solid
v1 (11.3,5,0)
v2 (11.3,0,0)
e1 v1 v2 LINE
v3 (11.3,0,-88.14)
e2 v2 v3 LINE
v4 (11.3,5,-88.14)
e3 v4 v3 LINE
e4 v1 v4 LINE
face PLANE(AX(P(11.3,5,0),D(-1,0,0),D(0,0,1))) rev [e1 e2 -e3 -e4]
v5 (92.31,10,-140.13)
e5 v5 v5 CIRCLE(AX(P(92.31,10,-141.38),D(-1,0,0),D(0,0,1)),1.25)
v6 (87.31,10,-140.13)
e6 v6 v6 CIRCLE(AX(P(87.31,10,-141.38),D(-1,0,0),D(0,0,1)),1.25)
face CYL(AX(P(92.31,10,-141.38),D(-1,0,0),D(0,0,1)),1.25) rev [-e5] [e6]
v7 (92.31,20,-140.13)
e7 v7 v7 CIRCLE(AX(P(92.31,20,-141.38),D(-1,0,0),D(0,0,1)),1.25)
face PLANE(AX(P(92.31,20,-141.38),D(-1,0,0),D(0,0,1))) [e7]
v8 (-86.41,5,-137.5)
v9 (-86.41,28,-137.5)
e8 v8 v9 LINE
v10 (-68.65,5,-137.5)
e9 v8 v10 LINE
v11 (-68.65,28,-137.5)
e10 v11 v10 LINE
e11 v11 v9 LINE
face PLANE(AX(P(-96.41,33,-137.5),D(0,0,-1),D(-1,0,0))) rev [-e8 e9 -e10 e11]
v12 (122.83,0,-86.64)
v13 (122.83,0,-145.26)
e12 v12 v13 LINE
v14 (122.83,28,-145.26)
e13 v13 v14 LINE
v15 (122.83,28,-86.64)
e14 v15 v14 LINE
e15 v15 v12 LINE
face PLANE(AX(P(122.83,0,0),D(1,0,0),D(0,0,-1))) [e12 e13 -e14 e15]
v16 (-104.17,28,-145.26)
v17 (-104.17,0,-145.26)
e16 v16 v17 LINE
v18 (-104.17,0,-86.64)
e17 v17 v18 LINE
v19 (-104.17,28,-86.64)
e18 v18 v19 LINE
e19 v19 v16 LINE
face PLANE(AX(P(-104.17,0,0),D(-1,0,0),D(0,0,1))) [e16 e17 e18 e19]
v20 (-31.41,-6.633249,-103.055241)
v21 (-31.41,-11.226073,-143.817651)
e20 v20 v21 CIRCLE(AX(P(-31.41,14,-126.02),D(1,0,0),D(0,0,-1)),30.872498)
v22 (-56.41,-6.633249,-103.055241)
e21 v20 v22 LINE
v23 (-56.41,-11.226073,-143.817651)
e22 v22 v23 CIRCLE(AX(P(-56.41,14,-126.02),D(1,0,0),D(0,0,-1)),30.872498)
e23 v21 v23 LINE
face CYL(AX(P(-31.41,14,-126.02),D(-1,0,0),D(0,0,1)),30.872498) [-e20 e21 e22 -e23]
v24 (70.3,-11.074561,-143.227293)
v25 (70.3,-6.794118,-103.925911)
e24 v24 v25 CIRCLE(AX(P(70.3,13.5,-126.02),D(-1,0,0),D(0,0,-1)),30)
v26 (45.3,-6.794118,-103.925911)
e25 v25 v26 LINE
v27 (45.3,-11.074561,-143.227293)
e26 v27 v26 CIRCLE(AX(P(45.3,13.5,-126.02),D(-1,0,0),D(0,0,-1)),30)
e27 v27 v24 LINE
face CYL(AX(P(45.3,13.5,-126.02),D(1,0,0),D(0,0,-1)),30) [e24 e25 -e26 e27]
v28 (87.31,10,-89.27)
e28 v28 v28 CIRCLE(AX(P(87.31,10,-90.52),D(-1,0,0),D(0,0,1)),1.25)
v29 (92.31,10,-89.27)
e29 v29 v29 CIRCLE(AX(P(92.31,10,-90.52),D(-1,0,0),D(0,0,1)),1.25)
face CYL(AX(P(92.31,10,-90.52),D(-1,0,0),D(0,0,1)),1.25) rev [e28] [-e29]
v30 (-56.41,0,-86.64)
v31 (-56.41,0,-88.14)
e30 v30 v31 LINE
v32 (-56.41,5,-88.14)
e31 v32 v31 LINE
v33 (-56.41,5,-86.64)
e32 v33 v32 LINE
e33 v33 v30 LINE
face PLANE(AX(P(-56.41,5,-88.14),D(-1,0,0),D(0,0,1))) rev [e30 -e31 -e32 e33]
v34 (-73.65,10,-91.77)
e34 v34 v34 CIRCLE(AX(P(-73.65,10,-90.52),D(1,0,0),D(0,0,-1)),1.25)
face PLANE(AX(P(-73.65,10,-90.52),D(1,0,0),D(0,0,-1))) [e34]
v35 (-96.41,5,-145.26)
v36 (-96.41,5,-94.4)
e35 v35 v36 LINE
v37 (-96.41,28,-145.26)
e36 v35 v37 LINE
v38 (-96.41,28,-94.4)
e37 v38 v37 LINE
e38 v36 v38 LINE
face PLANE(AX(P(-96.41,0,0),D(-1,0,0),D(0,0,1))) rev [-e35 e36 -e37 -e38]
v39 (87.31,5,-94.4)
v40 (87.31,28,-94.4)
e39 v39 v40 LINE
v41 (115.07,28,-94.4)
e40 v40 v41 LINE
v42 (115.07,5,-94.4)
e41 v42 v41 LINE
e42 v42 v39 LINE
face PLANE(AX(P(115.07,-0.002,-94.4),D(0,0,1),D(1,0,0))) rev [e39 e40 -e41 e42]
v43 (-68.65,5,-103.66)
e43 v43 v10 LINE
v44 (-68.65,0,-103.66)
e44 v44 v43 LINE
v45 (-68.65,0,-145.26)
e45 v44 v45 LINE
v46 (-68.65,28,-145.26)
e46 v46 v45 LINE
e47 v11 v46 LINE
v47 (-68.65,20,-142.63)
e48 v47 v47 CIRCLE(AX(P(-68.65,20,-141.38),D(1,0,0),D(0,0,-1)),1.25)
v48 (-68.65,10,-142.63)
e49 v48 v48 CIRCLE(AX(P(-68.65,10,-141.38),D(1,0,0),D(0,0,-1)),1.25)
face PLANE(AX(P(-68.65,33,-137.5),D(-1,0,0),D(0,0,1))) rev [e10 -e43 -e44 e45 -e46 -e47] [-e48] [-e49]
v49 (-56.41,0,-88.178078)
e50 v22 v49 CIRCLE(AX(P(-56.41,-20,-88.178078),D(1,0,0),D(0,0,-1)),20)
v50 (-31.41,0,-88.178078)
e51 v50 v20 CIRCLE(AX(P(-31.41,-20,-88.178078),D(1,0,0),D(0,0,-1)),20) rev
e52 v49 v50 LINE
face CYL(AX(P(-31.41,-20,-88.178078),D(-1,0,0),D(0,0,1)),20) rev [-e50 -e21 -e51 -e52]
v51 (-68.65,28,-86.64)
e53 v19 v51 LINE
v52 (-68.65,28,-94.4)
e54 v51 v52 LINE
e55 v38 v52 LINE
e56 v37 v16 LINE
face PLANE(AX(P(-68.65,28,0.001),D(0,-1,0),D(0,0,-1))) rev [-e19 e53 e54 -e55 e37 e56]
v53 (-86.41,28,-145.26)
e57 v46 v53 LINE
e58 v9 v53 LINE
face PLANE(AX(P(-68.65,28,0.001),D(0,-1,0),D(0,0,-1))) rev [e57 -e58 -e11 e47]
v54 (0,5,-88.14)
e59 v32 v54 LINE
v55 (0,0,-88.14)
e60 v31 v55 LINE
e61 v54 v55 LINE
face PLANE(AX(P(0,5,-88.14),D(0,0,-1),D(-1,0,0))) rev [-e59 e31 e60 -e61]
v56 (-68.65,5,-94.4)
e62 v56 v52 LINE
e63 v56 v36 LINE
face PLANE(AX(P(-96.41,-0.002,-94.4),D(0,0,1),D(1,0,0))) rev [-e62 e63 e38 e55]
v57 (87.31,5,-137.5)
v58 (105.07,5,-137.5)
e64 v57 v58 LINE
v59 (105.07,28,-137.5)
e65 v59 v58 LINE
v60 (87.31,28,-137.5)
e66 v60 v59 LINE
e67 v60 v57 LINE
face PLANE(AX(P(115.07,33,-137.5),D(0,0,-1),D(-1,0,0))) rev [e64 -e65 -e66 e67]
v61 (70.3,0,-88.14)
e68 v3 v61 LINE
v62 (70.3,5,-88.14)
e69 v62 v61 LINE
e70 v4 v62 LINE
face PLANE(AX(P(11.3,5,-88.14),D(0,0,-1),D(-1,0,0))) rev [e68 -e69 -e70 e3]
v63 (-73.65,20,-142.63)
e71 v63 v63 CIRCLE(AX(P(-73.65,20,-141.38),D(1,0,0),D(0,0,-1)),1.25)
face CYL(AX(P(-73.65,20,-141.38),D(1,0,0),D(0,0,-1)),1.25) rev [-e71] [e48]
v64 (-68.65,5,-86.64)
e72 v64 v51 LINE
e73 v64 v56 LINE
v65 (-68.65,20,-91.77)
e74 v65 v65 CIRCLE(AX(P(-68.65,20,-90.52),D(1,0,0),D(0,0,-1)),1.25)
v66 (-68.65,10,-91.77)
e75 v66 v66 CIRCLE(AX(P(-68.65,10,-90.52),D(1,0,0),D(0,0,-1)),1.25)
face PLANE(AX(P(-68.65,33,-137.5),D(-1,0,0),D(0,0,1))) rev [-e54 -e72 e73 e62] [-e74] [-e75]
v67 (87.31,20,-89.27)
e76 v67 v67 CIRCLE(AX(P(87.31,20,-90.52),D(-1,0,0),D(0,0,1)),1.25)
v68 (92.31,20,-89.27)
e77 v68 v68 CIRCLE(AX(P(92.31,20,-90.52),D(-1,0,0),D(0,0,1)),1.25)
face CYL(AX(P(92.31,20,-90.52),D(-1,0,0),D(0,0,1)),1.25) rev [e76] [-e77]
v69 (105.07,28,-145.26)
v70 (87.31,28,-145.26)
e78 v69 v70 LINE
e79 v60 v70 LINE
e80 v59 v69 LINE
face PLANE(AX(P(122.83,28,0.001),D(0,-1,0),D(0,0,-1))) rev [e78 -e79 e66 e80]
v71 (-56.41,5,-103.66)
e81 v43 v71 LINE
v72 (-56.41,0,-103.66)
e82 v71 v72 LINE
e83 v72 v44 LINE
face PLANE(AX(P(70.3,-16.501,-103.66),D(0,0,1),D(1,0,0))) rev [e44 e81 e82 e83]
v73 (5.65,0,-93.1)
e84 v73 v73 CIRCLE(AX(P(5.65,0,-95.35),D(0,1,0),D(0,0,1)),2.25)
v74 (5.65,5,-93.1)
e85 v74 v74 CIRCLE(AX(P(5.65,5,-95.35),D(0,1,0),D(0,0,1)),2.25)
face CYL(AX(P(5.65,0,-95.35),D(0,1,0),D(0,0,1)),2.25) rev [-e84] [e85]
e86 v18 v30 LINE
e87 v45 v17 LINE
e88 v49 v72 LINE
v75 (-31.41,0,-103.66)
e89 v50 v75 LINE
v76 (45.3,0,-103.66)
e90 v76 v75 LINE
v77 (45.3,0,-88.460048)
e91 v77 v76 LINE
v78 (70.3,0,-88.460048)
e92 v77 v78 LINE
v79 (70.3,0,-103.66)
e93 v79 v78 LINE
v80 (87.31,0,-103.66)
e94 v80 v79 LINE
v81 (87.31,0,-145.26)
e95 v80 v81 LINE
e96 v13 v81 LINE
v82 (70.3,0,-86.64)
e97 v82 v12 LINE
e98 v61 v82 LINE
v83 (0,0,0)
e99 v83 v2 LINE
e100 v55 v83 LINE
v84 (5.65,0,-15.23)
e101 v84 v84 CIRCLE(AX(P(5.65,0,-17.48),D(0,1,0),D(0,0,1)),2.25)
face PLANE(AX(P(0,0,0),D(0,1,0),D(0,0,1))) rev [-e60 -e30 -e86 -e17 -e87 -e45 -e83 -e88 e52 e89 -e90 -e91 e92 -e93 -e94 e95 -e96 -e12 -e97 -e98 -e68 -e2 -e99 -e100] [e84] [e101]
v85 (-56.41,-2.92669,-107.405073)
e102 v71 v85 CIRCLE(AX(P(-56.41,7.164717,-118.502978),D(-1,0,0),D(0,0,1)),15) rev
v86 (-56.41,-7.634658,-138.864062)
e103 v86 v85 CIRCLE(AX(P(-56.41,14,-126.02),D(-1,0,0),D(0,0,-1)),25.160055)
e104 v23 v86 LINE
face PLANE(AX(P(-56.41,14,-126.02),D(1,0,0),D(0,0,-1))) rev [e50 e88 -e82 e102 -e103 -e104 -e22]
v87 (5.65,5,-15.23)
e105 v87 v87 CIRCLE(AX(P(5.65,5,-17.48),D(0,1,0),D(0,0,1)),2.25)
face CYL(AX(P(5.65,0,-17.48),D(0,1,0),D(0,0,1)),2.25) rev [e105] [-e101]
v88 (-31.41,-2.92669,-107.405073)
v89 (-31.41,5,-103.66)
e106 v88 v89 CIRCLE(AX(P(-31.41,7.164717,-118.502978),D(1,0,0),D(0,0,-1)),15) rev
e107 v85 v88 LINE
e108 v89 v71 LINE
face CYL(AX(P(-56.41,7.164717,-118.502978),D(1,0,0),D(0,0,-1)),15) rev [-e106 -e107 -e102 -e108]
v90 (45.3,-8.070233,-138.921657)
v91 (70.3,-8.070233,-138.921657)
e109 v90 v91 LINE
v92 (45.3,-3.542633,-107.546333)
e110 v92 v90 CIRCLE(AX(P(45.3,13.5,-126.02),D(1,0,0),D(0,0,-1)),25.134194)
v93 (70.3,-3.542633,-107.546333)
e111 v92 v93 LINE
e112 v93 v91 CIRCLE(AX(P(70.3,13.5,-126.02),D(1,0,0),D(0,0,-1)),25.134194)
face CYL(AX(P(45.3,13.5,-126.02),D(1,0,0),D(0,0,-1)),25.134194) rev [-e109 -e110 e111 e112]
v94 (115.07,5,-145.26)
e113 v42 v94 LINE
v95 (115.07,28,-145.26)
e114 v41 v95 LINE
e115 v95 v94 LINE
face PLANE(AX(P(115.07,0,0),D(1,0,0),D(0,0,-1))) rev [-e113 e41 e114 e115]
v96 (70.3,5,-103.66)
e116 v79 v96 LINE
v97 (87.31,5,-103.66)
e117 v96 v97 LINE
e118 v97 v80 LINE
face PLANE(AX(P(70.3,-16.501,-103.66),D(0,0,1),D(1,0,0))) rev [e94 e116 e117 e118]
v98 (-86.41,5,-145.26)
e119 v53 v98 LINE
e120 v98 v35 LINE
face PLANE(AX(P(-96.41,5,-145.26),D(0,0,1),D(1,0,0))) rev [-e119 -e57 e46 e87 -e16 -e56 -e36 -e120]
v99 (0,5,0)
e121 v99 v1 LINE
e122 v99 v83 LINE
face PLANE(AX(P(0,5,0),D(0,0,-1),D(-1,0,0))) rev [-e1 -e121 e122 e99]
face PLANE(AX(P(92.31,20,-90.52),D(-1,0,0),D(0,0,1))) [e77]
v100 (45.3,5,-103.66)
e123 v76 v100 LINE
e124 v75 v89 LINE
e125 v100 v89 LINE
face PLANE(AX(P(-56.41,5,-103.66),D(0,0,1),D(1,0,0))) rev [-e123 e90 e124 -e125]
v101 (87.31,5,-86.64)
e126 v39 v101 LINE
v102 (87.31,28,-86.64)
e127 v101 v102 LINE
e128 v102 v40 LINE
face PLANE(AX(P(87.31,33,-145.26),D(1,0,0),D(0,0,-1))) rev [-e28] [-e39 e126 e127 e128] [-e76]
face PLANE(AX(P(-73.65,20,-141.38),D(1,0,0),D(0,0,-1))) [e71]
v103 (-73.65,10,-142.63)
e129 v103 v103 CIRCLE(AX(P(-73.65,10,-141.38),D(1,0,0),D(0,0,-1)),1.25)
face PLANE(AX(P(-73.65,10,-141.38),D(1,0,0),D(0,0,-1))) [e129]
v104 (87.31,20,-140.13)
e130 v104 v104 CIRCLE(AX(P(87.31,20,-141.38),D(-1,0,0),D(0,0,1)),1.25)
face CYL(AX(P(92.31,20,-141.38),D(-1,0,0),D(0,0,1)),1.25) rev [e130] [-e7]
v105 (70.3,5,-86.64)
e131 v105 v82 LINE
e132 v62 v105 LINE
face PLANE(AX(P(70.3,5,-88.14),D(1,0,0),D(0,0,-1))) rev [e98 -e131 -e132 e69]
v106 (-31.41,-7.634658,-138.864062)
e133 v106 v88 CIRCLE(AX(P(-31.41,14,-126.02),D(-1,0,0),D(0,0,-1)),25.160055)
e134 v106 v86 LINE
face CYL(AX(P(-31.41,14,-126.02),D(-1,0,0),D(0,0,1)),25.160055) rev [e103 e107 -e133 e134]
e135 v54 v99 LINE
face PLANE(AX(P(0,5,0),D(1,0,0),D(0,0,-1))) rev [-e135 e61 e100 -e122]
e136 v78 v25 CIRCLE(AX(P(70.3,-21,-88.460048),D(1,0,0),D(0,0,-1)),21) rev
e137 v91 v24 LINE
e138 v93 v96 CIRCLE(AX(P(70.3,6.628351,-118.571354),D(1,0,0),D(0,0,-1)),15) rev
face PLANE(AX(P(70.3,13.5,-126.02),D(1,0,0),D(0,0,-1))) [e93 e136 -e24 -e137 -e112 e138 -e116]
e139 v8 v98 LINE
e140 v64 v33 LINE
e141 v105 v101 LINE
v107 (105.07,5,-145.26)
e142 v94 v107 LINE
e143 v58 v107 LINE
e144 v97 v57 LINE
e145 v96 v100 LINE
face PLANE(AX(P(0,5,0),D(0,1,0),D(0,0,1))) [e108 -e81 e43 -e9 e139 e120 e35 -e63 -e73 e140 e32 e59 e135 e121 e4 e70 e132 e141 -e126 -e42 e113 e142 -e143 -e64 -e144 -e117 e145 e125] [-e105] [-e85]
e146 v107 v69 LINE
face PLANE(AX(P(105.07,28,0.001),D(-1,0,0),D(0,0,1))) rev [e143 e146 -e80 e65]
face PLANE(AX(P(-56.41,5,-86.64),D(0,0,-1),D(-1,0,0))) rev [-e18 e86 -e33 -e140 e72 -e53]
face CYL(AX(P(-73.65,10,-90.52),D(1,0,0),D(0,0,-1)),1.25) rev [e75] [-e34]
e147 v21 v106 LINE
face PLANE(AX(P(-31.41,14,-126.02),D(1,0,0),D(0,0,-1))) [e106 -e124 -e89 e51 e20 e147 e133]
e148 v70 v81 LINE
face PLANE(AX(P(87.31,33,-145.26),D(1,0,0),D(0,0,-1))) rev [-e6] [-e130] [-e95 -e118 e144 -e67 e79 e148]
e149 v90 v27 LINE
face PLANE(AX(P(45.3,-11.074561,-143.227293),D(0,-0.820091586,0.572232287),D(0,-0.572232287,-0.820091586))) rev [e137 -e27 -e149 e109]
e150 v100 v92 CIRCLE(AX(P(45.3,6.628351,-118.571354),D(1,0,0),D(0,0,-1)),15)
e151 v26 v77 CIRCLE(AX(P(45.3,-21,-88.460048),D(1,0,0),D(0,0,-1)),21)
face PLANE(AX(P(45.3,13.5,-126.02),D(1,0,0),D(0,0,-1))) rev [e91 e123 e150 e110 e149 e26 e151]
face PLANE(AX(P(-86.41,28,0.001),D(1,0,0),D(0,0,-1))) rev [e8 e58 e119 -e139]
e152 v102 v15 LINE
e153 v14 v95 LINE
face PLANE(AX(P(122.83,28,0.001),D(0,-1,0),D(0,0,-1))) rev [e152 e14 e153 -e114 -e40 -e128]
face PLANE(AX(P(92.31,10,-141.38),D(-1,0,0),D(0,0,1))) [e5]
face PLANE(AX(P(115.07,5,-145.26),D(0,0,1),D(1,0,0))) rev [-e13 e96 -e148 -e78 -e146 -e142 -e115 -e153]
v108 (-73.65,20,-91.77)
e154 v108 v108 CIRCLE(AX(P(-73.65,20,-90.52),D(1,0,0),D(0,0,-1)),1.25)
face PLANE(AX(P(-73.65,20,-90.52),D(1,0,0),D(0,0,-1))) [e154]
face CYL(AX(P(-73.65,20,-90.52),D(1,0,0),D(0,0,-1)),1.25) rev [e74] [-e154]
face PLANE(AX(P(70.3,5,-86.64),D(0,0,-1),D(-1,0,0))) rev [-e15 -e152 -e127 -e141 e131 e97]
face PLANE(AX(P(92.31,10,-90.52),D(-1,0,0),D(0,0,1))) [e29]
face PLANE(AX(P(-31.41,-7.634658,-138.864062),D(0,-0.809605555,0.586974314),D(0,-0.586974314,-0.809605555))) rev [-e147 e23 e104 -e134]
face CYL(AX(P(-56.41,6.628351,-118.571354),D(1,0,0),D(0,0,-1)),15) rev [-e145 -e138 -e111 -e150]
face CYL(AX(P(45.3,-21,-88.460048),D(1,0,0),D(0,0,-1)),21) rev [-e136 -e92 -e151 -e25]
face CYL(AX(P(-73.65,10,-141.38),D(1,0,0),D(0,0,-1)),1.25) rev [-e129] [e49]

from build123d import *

# Parameters (mm, degrees)
BOSS_EXTRUDE1_DEPTH  = 5
SKETCH6_W            = 1.81
SKETCH6_H            = 7.76
SKETCH6_W_2          = 18.76
BOSS_EXTRUDE2_DEPTH  = 28
BOSS_EXTRUDE3_REACH  = 259.198
SKETCH7_W            = 7.76
SKETCH7_H            = 5
SKETCH9_W            = 27.76
SKETCH9_H            = 5
BOSS_EXTRUDE4_DEPTH  = 58.62
BOSS_EXTRUDE5_REACH  = 189.418
SKETCH10_W           = 27.76
SKETCH10_H           = 7.76
SKETCH11_W           = 58.62
SKETCH11_H           = 33
BOSS_EXTRUDE6_DEPTH  = 7.76
SKETCH12_R           = 2.25
CUT_EXTRUDE1_DEPTH   = 188.418175479
SKETCH13_W           = 1.81
SKETCH13_H           = 7.76
SKETCH13_W_2         = 18.76
BOSS_EXTRUDE7_DEPTH  = 28
BOSS_EXTRUDE8_REACH  = 265.563
SKETCH14_W           = 7.76
SKETCH14_H           = 5
SKETCH15_W           = 27.76
SKETCH15_H           = 5
BOSS_EXTRUDE9_DEPTH  = 50.86
BOSS_EXTRUDE10_REACH = 189.418
SKETCH16_W           = 27.76
SKETCH16_H           = 7.76
SKETCH17_W           = 58.62
SKETCH17_H           = 33
BOSS_EXTRUDE11_DEPTH = 7.76
CUT_EXTRUDE4_REACH   = 195.072
SKETCH23_W           = 35.52
SKETCH23_H           = 5
CUT_EXTRUDE5_REACH   = 195.072
SKETCH24_W           = 35.52
SKETCH24_H           = 5
SKETCH25_W           = 7.76
SKETCH25_H           = 23
CUT_EXTRUDE6_DEPTH   = 1.81
SKETCH26_W           = 7.76
SKETCH26_H           = 23
CUT_EXTRUDE7_DEPTH   = 1.81
SKETCH27_R           = 1.25
CUT_EXTRUDE8_DEPTH   = 5
CUT_EXTRUDE9_START   = -5
SKETCH28_R           = 1.25
CUT_EXTRUDE9_DEPTH   = 5
BOSS_EXTRUDE14_DEPTH = 25
SKETCH30_W           = 7.667684365
SKETCH30_H           = 9.552630881
CUT_EXTRUDE13_DEPTH  = 30
FILLET2_R            = 15
CUT_EXTRUDE14_REACH  = 193.616
SKETCH31_W           = 5
SKETCH31_H           = 41.6
FILLET6_R            = 21
BOSS_EXTRUDE15_DEPTH = 25
FILLET7_R            = 15
FILLET8_R            = 20
SKETCH37_W           = 7.377214054
SKETCH37_H           = 9
CUT_EXTRUDE16_DEPTH  = 25
CUT_EXTRUDE17_REACH  = 194.28
SKETCH38_W           = 1
SKETCH38_H           = 23
SKETCH39_W           = 12.24
SKETCH39_H           = 5
SKETCH39_W_2         = 12.01
CUT_EXTRUDE19_DEPTH  = 41.6


with BuildPart() as part:
    # Sketch5 → Boss-Extrude1 (new body)
    with BuildSketch(Plane(origin=(0, 0, 0), x_dir=(1, 0, 0), z_dir=(0, 1, 0))):
        Polygon((0, 0), (0, 88.14), (-56.41, 88.14), (-56.41, 86.64), (-96.41, 86.64), (-96.41, 145.26), (-56.41, 145.26), (-56.41, 103.66), (9.075, 103.66), (70.3, 103.66), (70.3, 145.26), (115.07, 145.26), (115.07, 86.64), (70.3, 86.64), (70.3, 88.14), (11.3, 88.14), (11.3, 0), align=None)
    extrude(amount=BOSS_EXTRUDE1_DEPTH)

    # Sketch6 → Boss-Extrude2 (add)
    with BuildSketch(Plane(origin=(0, 5, 0), x_dir=(1, 0, 0), z_dir=(0, 1, 0))):
        with Locations((-95.505, 141.38)):
            Rectangle(SKETCH6_W, SKETCH6_H)
        with Locations((-78.03, 141.38)):
            Rectangle(SKETCH6_W_2, SKETCH6_H)
    extrude(amount=BOSS_EXTRUDE2_DEPTH)

    # Sketch7 → Boss-Extrude3 (add, up to next)
    with BuildSketch(Plane(origin=(-94.6, 0, 0), x_dir=(0, 0, -1), z_dir=(1, 0, 0)), mode=Mode.PRIVATE) as boss_extrude3_sk1:
        with Locations((141.38, 30.5)):
            Rectangle(SKETCH7_W, SKETCH7_H)
    boss_extrude3_tool1 = extrude(boss_extrude3_sk1.sketch, amount=BOSS_EXTRUDE3_REACH, mode=Mode.PRIVATE) - part.part
    add(boss_extrude3_tool1.solids().sort_by_distance((-94.6, 30.5, -141.38))[0])

    # Sketch9 → Boss-Extrude4 (add)
    with BuildSketch(Plane(origin=(0, 0, -145.26), x_dir=(-1, 0, 0), z_dir=(0, 0, -1))):
        with Locations((82.53, 30.5)):
            Rectangle(SKETCH9_W, SKETCH9_H)
    extrude(amount=-BOSS_EXTRUDE4_DEPTH)

    # Sketch10 → Boss-Extrude5 (add, up to next)
    with BuildSketch(Plane.XZ.offset(-28), mode=Mode.PRIVATE) as boss_extrude5_sk1:
        with Locations((-82.53, -90.52)):
            Rectangle(SKETCH10_W, SKETCH10_H)
    boss_extrude5_tool1 = extrude(boss_extrude5_sk1.sketch, amount=BOSS_EXTRUDE5_REACH, mode=Mode.PRIVATE) - part.part
    add(boss_extrude5_tool1.solids().sort_by_distance((-82.53, 28, -90.52))[0])

    # Sketch11 → Boss-Extrude6 (add)
    with BuildSketch(Plane.ZY.offset(96.41)):
        with Locations((-115.95, 16.5)):
            Rectangle(SKETCH11_W, SKETCH11_H)
    extrude(amount=BOSS_EXTRUDE6_DEPTH)

    # Sketch12 → Cut-Extrude1 (cut, through all)
    with BuildSketch(Plane(origin=(0, 5, 0), x_dir=(1, 0, 0), z_dir=(0, 1, 0))):
        with Locations(Location((5.65, 17.48, 0), (0, 0, 270))):
            Circle(SKETCH12_R)
        with Locations(Location((5.65, 95.35, 0), (0, 0, 270))):
            Circle(SKETCH12_R)
    extrude(amount=-CUT_EXTRUDE1_DEPTH, mode=Mode.SUBTRACT)

    # Sketch13 → Boss-Extrude7 (add)
    with BuildSketch(Plane(origin=(0, 5, 0), x_dir=(1, 0, 0), z_dir=(0, 1, 0))):
        with Locations((114.165, 141.38)):
            Rectangle(SKETCH13_W, SKETCH13_H)
        with Locations((96.69, 141.38)):
            Rectangle(SKETCH13_W_2, SKETCH13_H)
    extrude(amount=BOSS_EXTRUDE7_DEPTH)

    # Sketch14 → Boss-Extrude8 (add, up to next)
    with BuildSketch(Plane.ZY.offset(-113.26), mode=Mode.PRIVATE) as boss_extrude8_sk1:
        with Locations((-141.38, 30.5)):
            Rectangle(SKETCH14_W, SKETCH14_H)
    boss_extrude8_tool1 = extrude(boss_extrude8_sk1.sketch, amount=BOSS_EXTRUDE8_REACH, mode=Mode.PRIVATE) - part.part
    add(boss_extrude8_tool1.solids().sort_by_distance((113.26, 30.5, -141.38))[0])

    # Sketch15 → Boss-Extrude9 (add)
    with BuildSketch(Plane.XY.offset(-137.5)):
        with Locations((101.19, 30.5)):
            Rectangle(SKETCH15_W, SKETCH15_H)
    extrude(amount=BOSS_EXTRUDE9_DEPTH)

    # Sketch16 → Boss-Extrude10 (add, up to next)
    with BuildSketch(Plane.XZ.offset(-28), mode=Mode.PRIVATE) as boss_extrude10_sk1:
        with Locations((101.19, -90.52)):
            Rectangle(SKETCH16_W, SKETCH16_H)
    boss_extrude10_tool1 = extrude(boss_extrude10_sk1.sketch, amount=BOSS_EXTRUDE10_REACH, mode=Mode.PRIVATE) - part.part
    add(boss_extrude10_tool1.solids().sort_by_distance((101.19, 28, -90.52))[0])

    # Sketch17 → Boss-Extrude11 (add)
    with BuildSketch(Plane(origin=(115.07, 0, 0), x_dir=(0, 0, -1), z_dir=(1, 0, 0))):
        with Locations((115.95, 16.5)):
            Rectangle(SKETCH17_W, SKETCH17_H)
    extrude(amount=BOSS_EXTRUDE11_DEPTH)

    # Sketch23 → Cut-Extrude4 (cut, up to next)
    with BuildSketch(Plane(origin=(0, 0, -145.26), x_dir=(-1, 0, 0), z_dir=(0, 0, -1)), mode=Mode.PRIVATE) as cut_extrude4_sk1:
        with Locations((-105.07, 30.5)):
            Rectangle(SKETCH23_W, SKETCH23_H)
    cut_extrude4_tool1 = extrude(cut_extrude4_sk1.sketch, amount=-CUT_EXTRUDE4_REACH, mode=Mode.PRIVATE) & part.part
    add(cut_extrude4_tool1.solids().sort_by_distance((105.07, 30.5, -145.26))[0], mode=Mode.SUBTRACT)

    # Sketch24 → Cut-Extrude5 (cut, up to next)
    with BuildSketch(Plane(origin=(0, 0, -145.26), x_dir=(-1, 0, 0), z_dir=(0, 0, -1)), mode=Mode.PRIVATE) as cut_extrude5_sk1:
        with Locations((86.41, 30.5)):
            Rectangle(SKETCH24_W, SKETCH24_H)
    cut_extrude5_tool1 = extrude(cut_extrude5_sk1.sketch, amount=-CUT_EXTRUDE5_REACH, mode=Mode.PRIVATE) & part.part
    add(cut_extrude5_tool1.solids().sort_by_distance((-86.41, 30.5, -145.26))[0], mode=Mode.SUBTRACT)

    # Sketch25 → Cut-Extrude6 (cut)
    with BuildSketch(Plane(origin=(-94.6, 0, 0), x_dir=(0, 0, -1), z_dir=(1, 0, 0))):
        with Locations((141.38, 16.5)):
            Rectangle(SKETCH25_W, SKETCH25_H)
    extrude(amount=-CUT_EXTRUDE6_DEPTH, mode=Mode.SUBTRACT)

    # Sketch26 → Cut-Extrude7 (cut)
    with BuildSketch(Plane.ZY.offset(-113.26)):
        with Locations((-141.38, 16.5)):
            Rectangle(SKETCH26_W, SKETCH26_H)
    extrude(amount=-CUT_EXTRUDE7_DEPTH, mode=Mode.SUBTRACT)

    # Sketch27 → Cut-Extrude8 (cut)
    with BuildSketch(Plane(origin=(-68.65, 0, 0), x_dir=(0, 0, -1), z_dir=(1, 0, 0))):
        with Locations((141.38, 10)):
            Circle(SKETCH27_R)
        with Locations((141.38, 20)):
            Circle(SKETCH27_R)
        with Locations((90.52, 10)):
            Circle(SKETCH27_R)
        with Locations((90.52, 20)):
            Circle(SKETCH27_R)
    extrude(amount=-CUT_EXTRUDE8_DEPTH, mode=Mode.SUBTRACT)

    # Sketch28 → Cut-Extrude9 (cut)
    with BuildSketch(Plane.ZY.offset(-87.31).offset(CUT_EXTRUDE9_START)):
        with Locations(Location((-90.52, 10, 0), (0, 0, 180))):
            Circle(SKETCH28_R)
        with Locations(Location((-90.52, 20, 0), (0, 0, 180))):
            Circle(SKETCH28_R)
        with Locations(Location((-141.38, 10, 0), (0, 0, 180))):
            Circle(SKETCH28_R)
        with Locations(Location((-141.38, 20, 0), (0, 0, 180))):
            Circle(SKETCH28_R)
    extrude(amount=CUT_EXTRUDE9_DEPTH, mode=Mode.SUBTRACT)

    # Sketch29 → Boss-Extrude14 (add)
    with BuildSketch(Plane.ZY.offset(-70.3)):
        with BuildLine():
            Line((-100.885806154, 13.5), (-96.02, 13.5))
            ThreePointArc((-96.02, 13.5), (-112.167541603, -13.110324995), (-143.227293091, -11.074561329))
            Line((-143.227293091, -11.074561329), (-138.921656543, -8.070233163))
            ThreePointArc((-138.921656543, -8.070233163), (-113.621311283, -8.363216103), (-100.885806154, 13.5))
        make_face()
    extrude(amount=BOSS_EXTRUDE14_DEPTH)

    # Sketch30 → Cut-Extrude13 (cut)
    with BuildSketch(Plane.ZY.offset(-45.3)):
        with Locations((-98.532876856, 9.77631544)):
            Rectangle(SKETCH30_W, SKETCH30_H)
    extrude(amount=-CUT_EXTRUDE13_DEPTH, mode=Mode.SUBTRACT)

    # Fillet2
    # the kernel refuses this fillet: 15 mm, written as the material it adds along each edge
    with BuildSketch(Plane(origin=(45.3, 2.021406869, -103.66), x_dir=(0, 1, 0), z_dir=(1, 0, 0))) as fillet2_piece_1:
        with BuildLine():
            CenterArc((4.606944532, -14.911353785), FILLET2_R, 96.232125796, 36.460543552)
            Line((-5.564040014, -3.886333451), (-5.767459705, -3.665833045))
            ThreePointArc((-5.767459705, -3.665833045), (-3.085586749, -1.508552064), (-0.137007694, 0.266887414))
            Line((-0.137007694, 0.266887414), (0, 0.3))
            ThreePointArc((0, 0.3), (1.489296566, 0.3), (2.946026103, 0.298227076))
            Line((2.946026103, 0.298227076), (2.978593131, 0))
        make_face()
    extrude(amount=25)

    # Sketch31 → Cut-Extrude14 (cut, up to next)
    with BuildSketch(Plane(origin=(0, 5, 0), x_dir=(1, 0, 0), z_dir=(0, 1, 0)), mode=Mode.PRIVATE) as cut_extrude14_sk1:
        with Locations((72.8, 124.46)):
            Rectangle(SKETCH31_W, SKETCH31_H)
    cut_extrude14_tool1 = extrude(cut_extrude14_sk1.sketch, amount=-CUT_EXTRUDE14_REACH, mode=Mode.PRIVATE) & part.part
    add(cut_extrude14_tool1.solids().sort_by_distance((72.8, 5, -124.46))[0], mode=Mode.SUBTRACT)

    # Fillet6
    fillet6_edges = [part.edges().sort_by_distance(p)[0] for p in [
        (57.8, 0, -99.229143351),
    ]]
    fillet(fillet6_edges, radius=FILLET6_R)

    # Sketch35 → Boss-Extrude15 (add)
    with BuildSketch(Plane(origin=(-56.41, 0, 0), x_dir=(0, 0, -1), z_dir=(1, 0, 0))):
        with BuildLine():
            Line((100.859945263, 14), (95.147502284, 14))
            ThreePointArc((95.147502284, 14), (111.813431349, -13.409569906), (143.817650668, -11.226072741))
            Line((143.817650668, -11.226072741), (138.864061969, -7.634657993))
            ThreePointArc((138.864061969, -7.634657993), (113.572690006, -7.865333939), (100.859945263, 14))
        make_face()
    extrude(amount=BOSS_EXTRUDE15_DEPTH)

    # Fillet7
    # the kernel refuses this fillet: 15 mm, written as the material it adds along each edge
    with BuildSketch(Plane(origin=(-31.41, 2.464890362, -103.66), x_dir=(0, -0.8213043286229281, -0.5704903152422844), z_dir=(-1, 0, 0))) as fillet7_piece_1:
        with BuildLine():
            CenterArc((4.607787404, -14.871807742), FILLET7_R, 82.503946448, 33.982894416)
            Line((-2.082096519, -1.446255497), (-2.215894198, -1.177744452))
            ThreePointArc((-2.215894198, -1.177744452), (-1.212195354, -0.47673645), (-0.171147095, 0.246391299))
            Line((-0.171147095, 0.246391299), (-0.039137371, 0.297436155))
            ThreePointArc((-0.039137371, 0.297436155), (3.282327972, 0.515021615), (6.603793315, 0.297436155))
            Line((6.603793315, 0.297436155), (6.564655944, 0))
        make_face()
    extrude(amount=25)

    # Fillet8
    fillet8_edges = [part.edges().sort_by_distance(p)[0] for p in [
        (-43.91, 0, -98.504347814),
    ]]
    fillet(fillet8_edges, radius=FILLET8_R)

    # Sketch37 → Cut-Extrude16 (cut)
    with BuildSketch(Plane(origin=(-31.41, 0, 0), x_dir=(0, 0, -1), z_dir=(1, 0, 0))):
        with Locations((98.836109311, 9.5)):
            Rectangle(SKETCH37_W, SKETCH37_H)
    extrude(amount=-CUT_EXTRUDE16_DEPTH, mode=Mode.SUBTRACT)

    # Sketch38 → Cut-Extrude17 (cut, up to next)
    with BuildSketch(Plane(origin=(0, 0, -145.26), x_dir=(-1, 0, 0), z_dir=(0, 0, -1)), mode=Mode.PRIVATE) as cut_extrude17_sk1:
        with Locations((86.91, 16.5)):
            Rectangle(SKETCH38_W, SKETCH38_H)
    cut_extrude17_tool1 = extrude(cut_extrude17_sk1.sketch, amount=-CUT_EXTRUDE17_REACH, mode=Mode.PRIVATE) & part.part
    # Sketch38 → Cut-Extrude17 (cut, up to next)
    with BuildSketch(Plane(origin=(0, 0, -145.26), x_dir=(-1, 0, 0), z_dir=(0, 0, -1)), mode=Mode.PRIVATE) as cut_extrude17_sk2:
        with Locations((-105.57, 16.5)):
            Rectangle(SKETCH38_W, SKETCH38_H)
    cut_extrude17_tool2 = extrude(cut_extrude17_sk2.sketch, amount=-CUT_EXTRUDE17_REACH, mode=Mode.PRIVATE) & part.part
    add(cut_extrude17_tool1.solids().sort_by_distance((-86.91, 16.5, -145.26))[0], mode=Mode.SUBTRACT)
    add(cut_extrude17_tool2.solids().sort_by_distance((105.57, 16.5, -145.26))[0], mode=Mode.SUBTRACT)

    # Sketch39 → Cut-Extrude19 (cut)
    with BuildSketch(Plane(origin=(0, 0, -145.26), x_dir=(-1, 0, 0), z_dir=(0, 0, -1))):
        with Locations((62.53, 2.5)):
            Rectangle(SKETCH39_W, SKETCH39_H)
        with Locations((-81.305, 2.5)):
            Rectangle(SKETCH39_W_2, SKETCH39_H)
    extrude(amount=-CUT_EXTRUDE19_DEPTH, mode=Mode.SUBTRACT)


solid = part.part
